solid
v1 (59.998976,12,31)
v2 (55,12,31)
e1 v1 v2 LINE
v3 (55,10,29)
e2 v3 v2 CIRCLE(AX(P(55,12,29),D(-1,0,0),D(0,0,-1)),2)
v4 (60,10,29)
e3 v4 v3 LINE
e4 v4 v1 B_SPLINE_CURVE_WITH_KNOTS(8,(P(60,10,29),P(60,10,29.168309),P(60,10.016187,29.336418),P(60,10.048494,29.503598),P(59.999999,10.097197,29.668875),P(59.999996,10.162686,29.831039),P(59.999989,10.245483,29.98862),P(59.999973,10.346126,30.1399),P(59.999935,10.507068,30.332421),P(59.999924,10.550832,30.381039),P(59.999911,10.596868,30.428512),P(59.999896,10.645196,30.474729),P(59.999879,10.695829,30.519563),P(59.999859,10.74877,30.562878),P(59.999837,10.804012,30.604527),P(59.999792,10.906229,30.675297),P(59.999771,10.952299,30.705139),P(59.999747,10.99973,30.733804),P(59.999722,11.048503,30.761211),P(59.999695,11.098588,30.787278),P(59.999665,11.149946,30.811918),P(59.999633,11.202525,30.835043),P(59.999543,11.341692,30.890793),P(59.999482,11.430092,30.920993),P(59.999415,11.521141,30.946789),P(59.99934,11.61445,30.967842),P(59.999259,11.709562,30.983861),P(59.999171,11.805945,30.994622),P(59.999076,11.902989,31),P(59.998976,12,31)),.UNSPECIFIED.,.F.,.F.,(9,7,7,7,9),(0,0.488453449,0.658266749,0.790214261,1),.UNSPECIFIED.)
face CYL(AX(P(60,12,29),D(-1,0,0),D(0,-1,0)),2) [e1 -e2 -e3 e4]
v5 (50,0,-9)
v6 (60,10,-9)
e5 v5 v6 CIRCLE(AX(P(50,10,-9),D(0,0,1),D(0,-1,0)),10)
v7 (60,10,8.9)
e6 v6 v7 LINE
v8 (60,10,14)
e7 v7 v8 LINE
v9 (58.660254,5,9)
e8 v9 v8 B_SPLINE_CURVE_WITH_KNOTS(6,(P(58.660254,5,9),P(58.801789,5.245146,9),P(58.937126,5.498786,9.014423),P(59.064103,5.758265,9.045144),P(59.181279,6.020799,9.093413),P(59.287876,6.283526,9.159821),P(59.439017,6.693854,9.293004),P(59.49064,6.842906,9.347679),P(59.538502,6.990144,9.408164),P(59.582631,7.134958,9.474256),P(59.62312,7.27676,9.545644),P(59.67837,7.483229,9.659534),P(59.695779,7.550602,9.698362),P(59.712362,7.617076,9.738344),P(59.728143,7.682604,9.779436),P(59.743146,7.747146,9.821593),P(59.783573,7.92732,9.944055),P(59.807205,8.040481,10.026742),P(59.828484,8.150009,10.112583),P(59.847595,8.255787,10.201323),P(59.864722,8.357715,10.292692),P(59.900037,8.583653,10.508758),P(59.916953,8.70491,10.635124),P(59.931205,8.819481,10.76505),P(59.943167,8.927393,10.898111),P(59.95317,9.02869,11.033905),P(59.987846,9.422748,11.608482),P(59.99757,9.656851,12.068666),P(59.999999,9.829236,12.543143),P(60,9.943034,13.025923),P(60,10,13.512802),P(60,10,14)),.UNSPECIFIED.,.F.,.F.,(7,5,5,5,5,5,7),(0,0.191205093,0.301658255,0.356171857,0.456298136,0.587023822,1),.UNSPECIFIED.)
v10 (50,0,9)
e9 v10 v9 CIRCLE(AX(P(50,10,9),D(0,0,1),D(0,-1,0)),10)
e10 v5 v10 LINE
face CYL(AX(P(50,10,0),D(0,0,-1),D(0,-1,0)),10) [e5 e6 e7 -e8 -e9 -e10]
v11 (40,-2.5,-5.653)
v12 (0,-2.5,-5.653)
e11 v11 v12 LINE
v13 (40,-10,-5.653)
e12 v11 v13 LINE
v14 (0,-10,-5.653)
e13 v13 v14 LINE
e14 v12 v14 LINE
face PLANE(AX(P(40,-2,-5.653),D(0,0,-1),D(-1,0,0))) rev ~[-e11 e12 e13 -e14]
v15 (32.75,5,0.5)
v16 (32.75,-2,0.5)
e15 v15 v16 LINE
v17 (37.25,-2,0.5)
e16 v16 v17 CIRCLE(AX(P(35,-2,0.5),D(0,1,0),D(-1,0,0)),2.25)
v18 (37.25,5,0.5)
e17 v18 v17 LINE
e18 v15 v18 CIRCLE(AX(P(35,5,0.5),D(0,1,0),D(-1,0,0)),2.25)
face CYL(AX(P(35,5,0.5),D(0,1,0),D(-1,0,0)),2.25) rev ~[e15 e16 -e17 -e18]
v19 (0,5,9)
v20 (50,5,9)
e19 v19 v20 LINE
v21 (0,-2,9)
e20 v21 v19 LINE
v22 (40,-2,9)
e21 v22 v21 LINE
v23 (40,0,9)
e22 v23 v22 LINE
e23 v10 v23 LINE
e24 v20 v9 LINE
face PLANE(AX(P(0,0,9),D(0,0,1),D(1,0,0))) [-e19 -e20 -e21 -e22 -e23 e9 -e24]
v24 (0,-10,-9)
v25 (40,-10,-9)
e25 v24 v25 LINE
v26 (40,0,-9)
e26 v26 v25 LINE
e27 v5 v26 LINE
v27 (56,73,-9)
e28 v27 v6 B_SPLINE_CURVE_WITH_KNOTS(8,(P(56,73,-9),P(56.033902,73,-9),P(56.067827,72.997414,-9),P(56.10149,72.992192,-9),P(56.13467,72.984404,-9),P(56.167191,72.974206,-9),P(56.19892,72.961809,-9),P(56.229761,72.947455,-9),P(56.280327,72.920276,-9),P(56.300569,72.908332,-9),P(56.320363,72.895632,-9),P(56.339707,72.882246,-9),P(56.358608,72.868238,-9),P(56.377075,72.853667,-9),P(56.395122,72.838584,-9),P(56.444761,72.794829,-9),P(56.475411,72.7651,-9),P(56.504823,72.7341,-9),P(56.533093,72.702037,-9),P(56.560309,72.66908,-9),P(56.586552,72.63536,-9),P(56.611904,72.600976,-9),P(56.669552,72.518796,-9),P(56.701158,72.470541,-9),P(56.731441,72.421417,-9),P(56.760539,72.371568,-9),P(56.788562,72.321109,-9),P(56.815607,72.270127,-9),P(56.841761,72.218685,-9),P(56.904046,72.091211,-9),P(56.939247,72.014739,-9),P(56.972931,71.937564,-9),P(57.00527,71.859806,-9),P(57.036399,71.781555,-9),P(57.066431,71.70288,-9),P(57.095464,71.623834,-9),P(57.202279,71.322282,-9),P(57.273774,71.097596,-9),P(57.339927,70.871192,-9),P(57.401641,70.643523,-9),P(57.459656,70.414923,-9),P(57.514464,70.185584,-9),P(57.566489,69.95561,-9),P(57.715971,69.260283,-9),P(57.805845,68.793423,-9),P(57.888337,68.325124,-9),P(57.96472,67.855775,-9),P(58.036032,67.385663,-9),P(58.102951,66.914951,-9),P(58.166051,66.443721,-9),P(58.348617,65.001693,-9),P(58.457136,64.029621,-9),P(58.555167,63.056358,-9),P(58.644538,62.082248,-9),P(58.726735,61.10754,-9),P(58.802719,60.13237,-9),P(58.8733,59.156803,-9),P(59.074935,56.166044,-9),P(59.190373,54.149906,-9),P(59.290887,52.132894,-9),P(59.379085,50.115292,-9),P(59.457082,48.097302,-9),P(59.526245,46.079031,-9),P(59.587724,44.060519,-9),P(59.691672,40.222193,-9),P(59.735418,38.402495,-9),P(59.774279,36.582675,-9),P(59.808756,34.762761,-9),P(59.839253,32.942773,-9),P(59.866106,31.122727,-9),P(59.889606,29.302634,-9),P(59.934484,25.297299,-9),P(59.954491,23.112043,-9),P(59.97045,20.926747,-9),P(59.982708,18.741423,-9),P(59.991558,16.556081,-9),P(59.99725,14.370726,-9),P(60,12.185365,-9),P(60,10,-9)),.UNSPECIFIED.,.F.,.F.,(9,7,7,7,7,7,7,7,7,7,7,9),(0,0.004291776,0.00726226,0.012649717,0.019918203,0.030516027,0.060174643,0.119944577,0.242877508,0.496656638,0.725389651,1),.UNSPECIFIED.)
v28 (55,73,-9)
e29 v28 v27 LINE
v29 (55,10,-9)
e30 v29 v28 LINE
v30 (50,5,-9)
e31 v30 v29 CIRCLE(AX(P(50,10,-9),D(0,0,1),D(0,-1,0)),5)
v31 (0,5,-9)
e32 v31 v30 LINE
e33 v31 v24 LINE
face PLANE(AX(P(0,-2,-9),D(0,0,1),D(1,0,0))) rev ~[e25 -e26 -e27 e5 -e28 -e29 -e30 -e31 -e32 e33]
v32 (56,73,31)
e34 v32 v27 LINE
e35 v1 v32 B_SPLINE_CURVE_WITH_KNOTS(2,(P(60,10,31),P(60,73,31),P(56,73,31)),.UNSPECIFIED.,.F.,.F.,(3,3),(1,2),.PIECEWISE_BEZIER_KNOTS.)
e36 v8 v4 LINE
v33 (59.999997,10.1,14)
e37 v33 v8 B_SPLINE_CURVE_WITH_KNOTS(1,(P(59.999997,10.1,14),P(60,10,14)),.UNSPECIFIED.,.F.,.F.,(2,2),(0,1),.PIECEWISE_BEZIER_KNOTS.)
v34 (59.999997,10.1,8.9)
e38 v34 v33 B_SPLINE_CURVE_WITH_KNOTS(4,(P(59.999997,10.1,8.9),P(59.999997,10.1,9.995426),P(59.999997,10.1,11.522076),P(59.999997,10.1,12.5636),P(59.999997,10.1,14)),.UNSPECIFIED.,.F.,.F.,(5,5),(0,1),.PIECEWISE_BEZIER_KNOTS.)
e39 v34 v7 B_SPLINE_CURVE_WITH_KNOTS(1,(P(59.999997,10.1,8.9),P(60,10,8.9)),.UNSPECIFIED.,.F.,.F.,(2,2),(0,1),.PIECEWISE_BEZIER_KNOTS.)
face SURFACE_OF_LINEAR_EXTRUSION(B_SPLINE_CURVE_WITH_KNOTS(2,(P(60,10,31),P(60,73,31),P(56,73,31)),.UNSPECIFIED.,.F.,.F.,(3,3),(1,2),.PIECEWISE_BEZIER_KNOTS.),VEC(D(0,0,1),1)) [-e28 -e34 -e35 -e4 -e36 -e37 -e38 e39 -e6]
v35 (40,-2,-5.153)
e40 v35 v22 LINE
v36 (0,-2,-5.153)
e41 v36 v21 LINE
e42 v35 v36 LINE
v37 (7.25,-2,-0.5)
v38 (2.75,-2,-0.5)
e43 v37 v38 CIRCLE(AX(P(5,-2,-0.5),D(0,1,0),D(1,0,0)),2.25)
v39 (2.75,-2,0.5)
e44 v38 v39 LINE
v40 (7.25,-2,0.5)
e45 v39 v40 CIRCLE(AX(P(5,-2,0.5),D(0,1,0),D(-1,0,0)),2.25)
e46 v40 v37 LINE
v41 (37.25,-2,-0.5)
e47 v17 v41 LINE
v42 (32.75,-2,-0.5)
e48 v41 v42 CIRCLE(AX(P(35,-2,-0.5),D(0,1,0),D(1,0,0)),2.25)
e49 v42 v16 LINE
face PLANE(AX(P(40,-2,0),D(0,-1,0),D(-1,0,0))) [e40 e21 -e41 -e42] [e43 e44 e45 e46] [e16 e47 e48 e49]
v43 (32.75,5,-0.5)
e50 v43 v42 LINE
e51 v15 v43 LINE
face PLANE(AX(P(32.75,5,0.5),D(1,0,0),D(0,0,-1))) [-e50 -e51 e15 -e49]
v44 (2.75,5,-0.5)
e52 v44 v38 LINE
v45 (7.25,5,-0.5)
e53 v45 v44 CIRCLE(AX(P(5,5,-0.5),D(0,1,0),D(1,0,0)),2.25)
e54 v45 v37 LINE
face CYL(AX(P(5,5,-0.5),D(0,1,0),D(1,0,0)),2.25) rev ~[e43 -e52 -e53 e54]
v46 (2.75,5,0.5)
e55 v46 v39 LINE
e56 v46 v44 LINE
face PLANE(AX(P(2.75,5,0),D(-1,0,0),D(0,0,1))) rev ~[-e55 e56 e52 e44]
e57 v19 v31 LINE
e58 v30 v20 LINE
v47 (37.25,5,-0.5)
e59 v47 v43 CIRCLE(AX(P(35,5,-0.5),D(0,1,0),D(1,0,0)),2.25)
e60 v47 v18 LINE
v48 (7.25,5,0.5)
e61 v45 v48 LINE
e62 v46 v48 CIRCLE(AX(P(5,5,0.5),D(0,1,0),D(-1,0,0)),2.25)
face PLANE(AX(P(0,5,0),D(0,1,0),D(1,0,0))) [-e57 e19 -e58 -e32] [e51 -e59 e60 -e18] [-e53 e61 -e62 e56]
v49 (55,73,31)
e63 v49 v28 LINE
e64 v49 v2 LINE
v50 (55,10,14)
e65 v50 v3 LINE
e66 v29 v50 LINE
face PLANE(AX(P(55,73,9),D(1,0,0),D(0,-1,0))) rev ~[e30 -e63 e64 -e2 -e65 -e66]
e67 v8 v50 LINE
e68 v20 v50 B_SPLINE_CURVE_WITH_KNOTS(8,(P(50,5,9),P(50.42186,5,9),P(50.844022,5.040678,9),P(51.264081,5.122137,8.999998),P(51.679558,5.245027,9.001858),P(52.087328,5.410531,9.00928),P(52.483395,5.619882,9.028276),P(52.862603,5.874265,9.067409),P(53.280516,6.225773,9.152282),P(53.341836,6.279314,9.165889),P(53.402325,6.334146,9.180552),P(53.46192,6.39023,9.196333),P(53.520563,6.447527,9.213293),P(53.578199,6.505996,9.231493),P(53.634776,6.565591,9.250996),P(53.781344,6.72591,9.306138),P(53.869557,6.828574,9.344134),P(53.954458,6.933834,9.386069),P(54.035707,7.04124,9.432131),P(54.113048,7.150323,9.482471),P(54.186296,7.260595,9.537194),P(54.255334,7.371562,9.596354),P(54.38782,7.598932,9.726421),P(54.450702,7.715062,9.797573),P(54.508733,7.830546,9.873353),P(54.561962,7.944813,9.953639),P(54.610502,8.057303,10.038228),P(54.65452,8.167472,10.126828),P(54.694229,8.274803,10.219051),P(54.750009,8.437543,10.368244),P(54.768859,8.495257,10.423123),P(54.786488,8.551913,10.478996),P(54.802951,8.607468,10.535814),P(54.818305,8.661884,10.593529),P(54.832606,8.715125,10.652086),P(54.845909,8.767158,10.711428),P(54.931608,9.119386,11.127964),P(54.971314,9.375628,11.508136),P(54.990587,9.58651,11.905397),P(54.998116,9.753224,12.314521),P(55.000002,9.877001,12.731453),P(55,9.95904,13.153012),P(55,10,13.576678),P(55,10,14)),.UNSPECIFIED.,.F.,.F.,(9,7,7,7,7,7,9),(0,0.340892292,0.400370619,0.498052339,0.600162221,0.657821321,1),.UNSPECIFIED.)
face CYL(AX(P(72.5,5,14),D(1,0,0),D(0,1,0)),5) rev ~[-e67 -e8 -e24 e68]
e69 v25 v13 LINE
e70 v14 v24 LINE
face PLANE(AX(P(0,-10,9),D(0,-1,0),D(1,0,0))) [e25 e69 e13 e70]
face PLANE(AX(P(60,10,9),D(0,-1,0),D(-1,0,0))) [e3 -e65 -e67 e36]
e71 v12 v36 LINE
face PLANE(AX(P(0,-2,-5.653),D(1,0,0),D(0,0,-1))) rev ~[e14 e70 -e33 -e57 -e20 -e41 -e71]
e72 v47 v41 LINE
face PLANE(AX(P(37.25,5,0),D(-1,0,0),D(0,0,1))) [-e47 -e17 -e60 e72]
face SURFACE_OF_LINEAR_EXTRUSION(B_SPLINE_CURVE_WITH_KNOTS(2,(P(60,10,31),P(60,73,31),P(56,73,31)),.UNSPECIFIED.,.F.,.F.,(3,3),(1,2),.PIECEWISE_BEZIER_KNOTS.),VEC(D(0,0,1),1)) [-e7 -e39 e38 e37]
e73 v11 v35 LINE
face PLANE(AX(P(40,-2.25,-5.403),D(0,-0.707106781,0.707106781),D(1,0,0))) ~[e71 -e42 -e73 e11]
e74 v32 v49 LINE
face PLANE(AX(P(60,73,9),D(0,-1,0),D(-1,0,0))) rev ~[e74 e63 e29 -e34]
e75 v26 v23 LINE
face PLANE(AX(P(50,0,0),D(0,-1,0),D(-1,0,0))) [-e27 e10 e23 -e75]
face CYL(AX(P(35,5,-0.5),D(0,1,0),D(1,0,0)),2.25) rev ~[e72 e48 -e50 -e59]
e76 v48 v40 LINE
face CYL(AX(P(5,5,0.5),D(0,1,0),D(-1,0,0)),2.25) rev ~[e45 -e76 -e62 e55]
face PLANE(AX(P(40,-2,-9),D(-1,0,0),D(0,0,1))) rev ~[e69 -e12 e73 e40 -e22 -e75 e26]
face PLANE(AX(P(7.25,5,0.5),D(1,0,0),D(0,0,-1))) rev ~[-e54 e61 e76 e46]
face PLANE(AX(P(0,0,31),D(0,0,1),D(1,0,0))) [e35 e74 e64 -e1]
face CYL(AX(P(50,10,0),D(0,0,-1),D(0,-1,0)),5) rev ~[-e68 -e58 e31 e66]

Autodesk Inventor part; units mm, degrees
ref_plane "YZ Plane" through (0, 0, 0) normal (1, 0, 0) x (0, 1, 0)
ref_plane "XZ Plane" through (0, 0, 0) normal (0, 1, 0) x (-1, 0, 0)
ref_plane "XY Plane" through (0, 0, 0) normal (0, 0, 1) x (1, 0, 0)
sketch "スケッチ1" plane through (0, 0, 0) normal (0, 0, 1) x (1, 0, 0)
  line L0 (0, 0) -> (0, 5)
  line L1 (0, 5) -> (50, 5)
  line L2 (55, 10) -> (55, 73)
  line L3 (55, 73) -> (60, 73)
  line L4 (60, 73) -> (60, 10)
  line L5 (50, 0) -> (0, 0)
  arc A0 (50, 0) -> (60, 10) centre (50, 10) ccw
  line L6 (0, 0) -> (50, 0)
  line L7 (40, 0) -> (40, -2)
  line L8 (40, -2) -> (0, -2)
  line L9 (0, -2) -> (0, 0)
  arc A1 (50, 5) -> (55, 10) centre (50, 10) ccw
  point P0 (60, 0)
  point P1 (55, 5)
  point P2 (40, 0)
  dimension "d0" = 55
  dimension "d1" = 73
  dimension "d2" = 5
  dimension "d3" = 5
  dimension "d5" = 10
  dimension "d34" = 2
  dimension "d35" = 40
  dimension "d58" = 5
extrude "押し出し1" add sketch "スケッチ1" along normal mid plane 18
sketch "スケッチ2" plane through (0, 5, 9) normal (0, 1, 0) x (1, 0, 0)
  line L0 (50, 0) -> (0, 0) projected
  line L1 (0, 18) -> (0, 0) projected
  point P0 (5, 9)
  point P1 (35, 9)
  dimension "d8" = 30
  dimension "d59" = 9
  dimension "d60" = 5
hole "穴1" at (5, 5, 0) at (35, 5, 0) direction (0, -1, 0) diameter 4.5 end through all clearance for "Flat Head Machine Screw" size "M4" standard "Ansi Metric M Profile"
sketch "スケッチ3" plane through (0, 0, 9) normal (0, 0, 1) x (1, 0, 0)
  line L0 (60, 10) -> (60, 73) projected
  line L1 (60, 73) -> (55, 73) projected
  line L2 (55, 73) -> (55, 10) projected
  line L3 (50, 5) -> (0, 5) projected
  line L4 (0, 5) -> (0, -2) projected
  arc A0 (50, 0) -> (60, 10) centre (50, 10) ccw projected
  line L5 (0, -2) -> (40, -2) projected
  line L6 (40, -2) -> (40, 0) projected
  line L7 (40, 0) -> (50, 0) projected
  line L8 (60, 10) -> (55, 10)
  line L9 (55, 73) -> (55, 10) projected
  arc A1 (50, 5) -> (55, 10) centre (50, 10) ccw projected
  point P0 (55, 6)
  point P1 (55, 10)
extrude "押し出し2" add sketch "スケッチ3" along normal blind 22 contours L8 L2 L1 L0
sketch "スケッチ4" plane through (0, -2, 9) normal (0, -1, 0) x (1, 0, 0)
  line L0 (0, -18) -> (40, -18)
  line L1 (40, -18) -> (40, -14.653)
  line L2 (40, -14.653) -> (0, -14.653)
  line L3 (0, -14.653) -> (0, -18)
  point P0 (0, -9)
  dimension "d20" = 40
  dimension "d21" = 3.347
extrude "押し出し3" add sketch "スケッチ4" along normal blind 8
chamfer "面取り1" distance 0.5 angle 45 1 edges at (20, -2, -5.653)
sketch "スケッチ6" plane through (0, 5, -9) normal (0, 1, 0) x (1, 0, 0)
  circle A0 centre (5, -9) radius 2.25 projected
  circle A1 centre (35, -9) radius 2.25 projected
  line L0 (5, -9.5) -> (5, -8.5) construction
  line L1 (7.25, -9.5) -> (7.25, -8.5)
  line L2 (2.75, -8.5) -> (2.75, -9.5)
  arc A2 (2.75, -9.5) -> (7.25, -9.5) centre (5, -9.5) ccw
  arc A3 (7.25, -8.5) -> (2.75, -8.5) centre (5, -8.5) ccw
  line L3 (35, -9.5) -> (35, -8.5) construction
  line L4 (32.75, -9.5) -> (32.75, -8.5)
  line L5 (37.25, -8.5) -> (37.25, -9.5)
  arc A4 (32.75, -9.5) -> (37.25, -9.5) centre (35, -9.5) ccw
  arc A5 (37.25, -8.5) -> (32.75, -8.5) centre (35, -8.5) ccw
  point P0 (0, -9)
  dimension "d37" = 1
  dimension "d38" = 1
extrude "押し出し5" cut sketch "スケッチ6" against normal blind 18
sketch "スケッチ5" plane through (0, 0, 31) normal (0, 0, 1) x (1, 0, 0)
  line L0 (55, 73) -> (60, 73) projected
  line L1 (60, 73) -> (60, 10) projected
  line L2 (55, 73) -> (55, 10) projected
  line L3 (60, 10) -> (60, 73) construction
  line L4 (60, 73) -> (56, 73) construction
  spline S0 degree 2 poles (60, 10) (60, 73) (56, 73) knots 1 1 1 2 2 2
  line L5 (60, 73) -> (55, 73) projected
  point P0 (0, 0)
  point P1 (55, 13)
  point P2 (55, 8)
  dimension "d30" = 1
extrude "押し出し4" cut sketch "スケッチ5" against normal through all
fillet "フィレット10" radius 2 1 edges at (57.5, 10, 31)
fillet "フィレット11" radius 5 1 edges at (57.5, 10, 9)
properties part number "base49"
